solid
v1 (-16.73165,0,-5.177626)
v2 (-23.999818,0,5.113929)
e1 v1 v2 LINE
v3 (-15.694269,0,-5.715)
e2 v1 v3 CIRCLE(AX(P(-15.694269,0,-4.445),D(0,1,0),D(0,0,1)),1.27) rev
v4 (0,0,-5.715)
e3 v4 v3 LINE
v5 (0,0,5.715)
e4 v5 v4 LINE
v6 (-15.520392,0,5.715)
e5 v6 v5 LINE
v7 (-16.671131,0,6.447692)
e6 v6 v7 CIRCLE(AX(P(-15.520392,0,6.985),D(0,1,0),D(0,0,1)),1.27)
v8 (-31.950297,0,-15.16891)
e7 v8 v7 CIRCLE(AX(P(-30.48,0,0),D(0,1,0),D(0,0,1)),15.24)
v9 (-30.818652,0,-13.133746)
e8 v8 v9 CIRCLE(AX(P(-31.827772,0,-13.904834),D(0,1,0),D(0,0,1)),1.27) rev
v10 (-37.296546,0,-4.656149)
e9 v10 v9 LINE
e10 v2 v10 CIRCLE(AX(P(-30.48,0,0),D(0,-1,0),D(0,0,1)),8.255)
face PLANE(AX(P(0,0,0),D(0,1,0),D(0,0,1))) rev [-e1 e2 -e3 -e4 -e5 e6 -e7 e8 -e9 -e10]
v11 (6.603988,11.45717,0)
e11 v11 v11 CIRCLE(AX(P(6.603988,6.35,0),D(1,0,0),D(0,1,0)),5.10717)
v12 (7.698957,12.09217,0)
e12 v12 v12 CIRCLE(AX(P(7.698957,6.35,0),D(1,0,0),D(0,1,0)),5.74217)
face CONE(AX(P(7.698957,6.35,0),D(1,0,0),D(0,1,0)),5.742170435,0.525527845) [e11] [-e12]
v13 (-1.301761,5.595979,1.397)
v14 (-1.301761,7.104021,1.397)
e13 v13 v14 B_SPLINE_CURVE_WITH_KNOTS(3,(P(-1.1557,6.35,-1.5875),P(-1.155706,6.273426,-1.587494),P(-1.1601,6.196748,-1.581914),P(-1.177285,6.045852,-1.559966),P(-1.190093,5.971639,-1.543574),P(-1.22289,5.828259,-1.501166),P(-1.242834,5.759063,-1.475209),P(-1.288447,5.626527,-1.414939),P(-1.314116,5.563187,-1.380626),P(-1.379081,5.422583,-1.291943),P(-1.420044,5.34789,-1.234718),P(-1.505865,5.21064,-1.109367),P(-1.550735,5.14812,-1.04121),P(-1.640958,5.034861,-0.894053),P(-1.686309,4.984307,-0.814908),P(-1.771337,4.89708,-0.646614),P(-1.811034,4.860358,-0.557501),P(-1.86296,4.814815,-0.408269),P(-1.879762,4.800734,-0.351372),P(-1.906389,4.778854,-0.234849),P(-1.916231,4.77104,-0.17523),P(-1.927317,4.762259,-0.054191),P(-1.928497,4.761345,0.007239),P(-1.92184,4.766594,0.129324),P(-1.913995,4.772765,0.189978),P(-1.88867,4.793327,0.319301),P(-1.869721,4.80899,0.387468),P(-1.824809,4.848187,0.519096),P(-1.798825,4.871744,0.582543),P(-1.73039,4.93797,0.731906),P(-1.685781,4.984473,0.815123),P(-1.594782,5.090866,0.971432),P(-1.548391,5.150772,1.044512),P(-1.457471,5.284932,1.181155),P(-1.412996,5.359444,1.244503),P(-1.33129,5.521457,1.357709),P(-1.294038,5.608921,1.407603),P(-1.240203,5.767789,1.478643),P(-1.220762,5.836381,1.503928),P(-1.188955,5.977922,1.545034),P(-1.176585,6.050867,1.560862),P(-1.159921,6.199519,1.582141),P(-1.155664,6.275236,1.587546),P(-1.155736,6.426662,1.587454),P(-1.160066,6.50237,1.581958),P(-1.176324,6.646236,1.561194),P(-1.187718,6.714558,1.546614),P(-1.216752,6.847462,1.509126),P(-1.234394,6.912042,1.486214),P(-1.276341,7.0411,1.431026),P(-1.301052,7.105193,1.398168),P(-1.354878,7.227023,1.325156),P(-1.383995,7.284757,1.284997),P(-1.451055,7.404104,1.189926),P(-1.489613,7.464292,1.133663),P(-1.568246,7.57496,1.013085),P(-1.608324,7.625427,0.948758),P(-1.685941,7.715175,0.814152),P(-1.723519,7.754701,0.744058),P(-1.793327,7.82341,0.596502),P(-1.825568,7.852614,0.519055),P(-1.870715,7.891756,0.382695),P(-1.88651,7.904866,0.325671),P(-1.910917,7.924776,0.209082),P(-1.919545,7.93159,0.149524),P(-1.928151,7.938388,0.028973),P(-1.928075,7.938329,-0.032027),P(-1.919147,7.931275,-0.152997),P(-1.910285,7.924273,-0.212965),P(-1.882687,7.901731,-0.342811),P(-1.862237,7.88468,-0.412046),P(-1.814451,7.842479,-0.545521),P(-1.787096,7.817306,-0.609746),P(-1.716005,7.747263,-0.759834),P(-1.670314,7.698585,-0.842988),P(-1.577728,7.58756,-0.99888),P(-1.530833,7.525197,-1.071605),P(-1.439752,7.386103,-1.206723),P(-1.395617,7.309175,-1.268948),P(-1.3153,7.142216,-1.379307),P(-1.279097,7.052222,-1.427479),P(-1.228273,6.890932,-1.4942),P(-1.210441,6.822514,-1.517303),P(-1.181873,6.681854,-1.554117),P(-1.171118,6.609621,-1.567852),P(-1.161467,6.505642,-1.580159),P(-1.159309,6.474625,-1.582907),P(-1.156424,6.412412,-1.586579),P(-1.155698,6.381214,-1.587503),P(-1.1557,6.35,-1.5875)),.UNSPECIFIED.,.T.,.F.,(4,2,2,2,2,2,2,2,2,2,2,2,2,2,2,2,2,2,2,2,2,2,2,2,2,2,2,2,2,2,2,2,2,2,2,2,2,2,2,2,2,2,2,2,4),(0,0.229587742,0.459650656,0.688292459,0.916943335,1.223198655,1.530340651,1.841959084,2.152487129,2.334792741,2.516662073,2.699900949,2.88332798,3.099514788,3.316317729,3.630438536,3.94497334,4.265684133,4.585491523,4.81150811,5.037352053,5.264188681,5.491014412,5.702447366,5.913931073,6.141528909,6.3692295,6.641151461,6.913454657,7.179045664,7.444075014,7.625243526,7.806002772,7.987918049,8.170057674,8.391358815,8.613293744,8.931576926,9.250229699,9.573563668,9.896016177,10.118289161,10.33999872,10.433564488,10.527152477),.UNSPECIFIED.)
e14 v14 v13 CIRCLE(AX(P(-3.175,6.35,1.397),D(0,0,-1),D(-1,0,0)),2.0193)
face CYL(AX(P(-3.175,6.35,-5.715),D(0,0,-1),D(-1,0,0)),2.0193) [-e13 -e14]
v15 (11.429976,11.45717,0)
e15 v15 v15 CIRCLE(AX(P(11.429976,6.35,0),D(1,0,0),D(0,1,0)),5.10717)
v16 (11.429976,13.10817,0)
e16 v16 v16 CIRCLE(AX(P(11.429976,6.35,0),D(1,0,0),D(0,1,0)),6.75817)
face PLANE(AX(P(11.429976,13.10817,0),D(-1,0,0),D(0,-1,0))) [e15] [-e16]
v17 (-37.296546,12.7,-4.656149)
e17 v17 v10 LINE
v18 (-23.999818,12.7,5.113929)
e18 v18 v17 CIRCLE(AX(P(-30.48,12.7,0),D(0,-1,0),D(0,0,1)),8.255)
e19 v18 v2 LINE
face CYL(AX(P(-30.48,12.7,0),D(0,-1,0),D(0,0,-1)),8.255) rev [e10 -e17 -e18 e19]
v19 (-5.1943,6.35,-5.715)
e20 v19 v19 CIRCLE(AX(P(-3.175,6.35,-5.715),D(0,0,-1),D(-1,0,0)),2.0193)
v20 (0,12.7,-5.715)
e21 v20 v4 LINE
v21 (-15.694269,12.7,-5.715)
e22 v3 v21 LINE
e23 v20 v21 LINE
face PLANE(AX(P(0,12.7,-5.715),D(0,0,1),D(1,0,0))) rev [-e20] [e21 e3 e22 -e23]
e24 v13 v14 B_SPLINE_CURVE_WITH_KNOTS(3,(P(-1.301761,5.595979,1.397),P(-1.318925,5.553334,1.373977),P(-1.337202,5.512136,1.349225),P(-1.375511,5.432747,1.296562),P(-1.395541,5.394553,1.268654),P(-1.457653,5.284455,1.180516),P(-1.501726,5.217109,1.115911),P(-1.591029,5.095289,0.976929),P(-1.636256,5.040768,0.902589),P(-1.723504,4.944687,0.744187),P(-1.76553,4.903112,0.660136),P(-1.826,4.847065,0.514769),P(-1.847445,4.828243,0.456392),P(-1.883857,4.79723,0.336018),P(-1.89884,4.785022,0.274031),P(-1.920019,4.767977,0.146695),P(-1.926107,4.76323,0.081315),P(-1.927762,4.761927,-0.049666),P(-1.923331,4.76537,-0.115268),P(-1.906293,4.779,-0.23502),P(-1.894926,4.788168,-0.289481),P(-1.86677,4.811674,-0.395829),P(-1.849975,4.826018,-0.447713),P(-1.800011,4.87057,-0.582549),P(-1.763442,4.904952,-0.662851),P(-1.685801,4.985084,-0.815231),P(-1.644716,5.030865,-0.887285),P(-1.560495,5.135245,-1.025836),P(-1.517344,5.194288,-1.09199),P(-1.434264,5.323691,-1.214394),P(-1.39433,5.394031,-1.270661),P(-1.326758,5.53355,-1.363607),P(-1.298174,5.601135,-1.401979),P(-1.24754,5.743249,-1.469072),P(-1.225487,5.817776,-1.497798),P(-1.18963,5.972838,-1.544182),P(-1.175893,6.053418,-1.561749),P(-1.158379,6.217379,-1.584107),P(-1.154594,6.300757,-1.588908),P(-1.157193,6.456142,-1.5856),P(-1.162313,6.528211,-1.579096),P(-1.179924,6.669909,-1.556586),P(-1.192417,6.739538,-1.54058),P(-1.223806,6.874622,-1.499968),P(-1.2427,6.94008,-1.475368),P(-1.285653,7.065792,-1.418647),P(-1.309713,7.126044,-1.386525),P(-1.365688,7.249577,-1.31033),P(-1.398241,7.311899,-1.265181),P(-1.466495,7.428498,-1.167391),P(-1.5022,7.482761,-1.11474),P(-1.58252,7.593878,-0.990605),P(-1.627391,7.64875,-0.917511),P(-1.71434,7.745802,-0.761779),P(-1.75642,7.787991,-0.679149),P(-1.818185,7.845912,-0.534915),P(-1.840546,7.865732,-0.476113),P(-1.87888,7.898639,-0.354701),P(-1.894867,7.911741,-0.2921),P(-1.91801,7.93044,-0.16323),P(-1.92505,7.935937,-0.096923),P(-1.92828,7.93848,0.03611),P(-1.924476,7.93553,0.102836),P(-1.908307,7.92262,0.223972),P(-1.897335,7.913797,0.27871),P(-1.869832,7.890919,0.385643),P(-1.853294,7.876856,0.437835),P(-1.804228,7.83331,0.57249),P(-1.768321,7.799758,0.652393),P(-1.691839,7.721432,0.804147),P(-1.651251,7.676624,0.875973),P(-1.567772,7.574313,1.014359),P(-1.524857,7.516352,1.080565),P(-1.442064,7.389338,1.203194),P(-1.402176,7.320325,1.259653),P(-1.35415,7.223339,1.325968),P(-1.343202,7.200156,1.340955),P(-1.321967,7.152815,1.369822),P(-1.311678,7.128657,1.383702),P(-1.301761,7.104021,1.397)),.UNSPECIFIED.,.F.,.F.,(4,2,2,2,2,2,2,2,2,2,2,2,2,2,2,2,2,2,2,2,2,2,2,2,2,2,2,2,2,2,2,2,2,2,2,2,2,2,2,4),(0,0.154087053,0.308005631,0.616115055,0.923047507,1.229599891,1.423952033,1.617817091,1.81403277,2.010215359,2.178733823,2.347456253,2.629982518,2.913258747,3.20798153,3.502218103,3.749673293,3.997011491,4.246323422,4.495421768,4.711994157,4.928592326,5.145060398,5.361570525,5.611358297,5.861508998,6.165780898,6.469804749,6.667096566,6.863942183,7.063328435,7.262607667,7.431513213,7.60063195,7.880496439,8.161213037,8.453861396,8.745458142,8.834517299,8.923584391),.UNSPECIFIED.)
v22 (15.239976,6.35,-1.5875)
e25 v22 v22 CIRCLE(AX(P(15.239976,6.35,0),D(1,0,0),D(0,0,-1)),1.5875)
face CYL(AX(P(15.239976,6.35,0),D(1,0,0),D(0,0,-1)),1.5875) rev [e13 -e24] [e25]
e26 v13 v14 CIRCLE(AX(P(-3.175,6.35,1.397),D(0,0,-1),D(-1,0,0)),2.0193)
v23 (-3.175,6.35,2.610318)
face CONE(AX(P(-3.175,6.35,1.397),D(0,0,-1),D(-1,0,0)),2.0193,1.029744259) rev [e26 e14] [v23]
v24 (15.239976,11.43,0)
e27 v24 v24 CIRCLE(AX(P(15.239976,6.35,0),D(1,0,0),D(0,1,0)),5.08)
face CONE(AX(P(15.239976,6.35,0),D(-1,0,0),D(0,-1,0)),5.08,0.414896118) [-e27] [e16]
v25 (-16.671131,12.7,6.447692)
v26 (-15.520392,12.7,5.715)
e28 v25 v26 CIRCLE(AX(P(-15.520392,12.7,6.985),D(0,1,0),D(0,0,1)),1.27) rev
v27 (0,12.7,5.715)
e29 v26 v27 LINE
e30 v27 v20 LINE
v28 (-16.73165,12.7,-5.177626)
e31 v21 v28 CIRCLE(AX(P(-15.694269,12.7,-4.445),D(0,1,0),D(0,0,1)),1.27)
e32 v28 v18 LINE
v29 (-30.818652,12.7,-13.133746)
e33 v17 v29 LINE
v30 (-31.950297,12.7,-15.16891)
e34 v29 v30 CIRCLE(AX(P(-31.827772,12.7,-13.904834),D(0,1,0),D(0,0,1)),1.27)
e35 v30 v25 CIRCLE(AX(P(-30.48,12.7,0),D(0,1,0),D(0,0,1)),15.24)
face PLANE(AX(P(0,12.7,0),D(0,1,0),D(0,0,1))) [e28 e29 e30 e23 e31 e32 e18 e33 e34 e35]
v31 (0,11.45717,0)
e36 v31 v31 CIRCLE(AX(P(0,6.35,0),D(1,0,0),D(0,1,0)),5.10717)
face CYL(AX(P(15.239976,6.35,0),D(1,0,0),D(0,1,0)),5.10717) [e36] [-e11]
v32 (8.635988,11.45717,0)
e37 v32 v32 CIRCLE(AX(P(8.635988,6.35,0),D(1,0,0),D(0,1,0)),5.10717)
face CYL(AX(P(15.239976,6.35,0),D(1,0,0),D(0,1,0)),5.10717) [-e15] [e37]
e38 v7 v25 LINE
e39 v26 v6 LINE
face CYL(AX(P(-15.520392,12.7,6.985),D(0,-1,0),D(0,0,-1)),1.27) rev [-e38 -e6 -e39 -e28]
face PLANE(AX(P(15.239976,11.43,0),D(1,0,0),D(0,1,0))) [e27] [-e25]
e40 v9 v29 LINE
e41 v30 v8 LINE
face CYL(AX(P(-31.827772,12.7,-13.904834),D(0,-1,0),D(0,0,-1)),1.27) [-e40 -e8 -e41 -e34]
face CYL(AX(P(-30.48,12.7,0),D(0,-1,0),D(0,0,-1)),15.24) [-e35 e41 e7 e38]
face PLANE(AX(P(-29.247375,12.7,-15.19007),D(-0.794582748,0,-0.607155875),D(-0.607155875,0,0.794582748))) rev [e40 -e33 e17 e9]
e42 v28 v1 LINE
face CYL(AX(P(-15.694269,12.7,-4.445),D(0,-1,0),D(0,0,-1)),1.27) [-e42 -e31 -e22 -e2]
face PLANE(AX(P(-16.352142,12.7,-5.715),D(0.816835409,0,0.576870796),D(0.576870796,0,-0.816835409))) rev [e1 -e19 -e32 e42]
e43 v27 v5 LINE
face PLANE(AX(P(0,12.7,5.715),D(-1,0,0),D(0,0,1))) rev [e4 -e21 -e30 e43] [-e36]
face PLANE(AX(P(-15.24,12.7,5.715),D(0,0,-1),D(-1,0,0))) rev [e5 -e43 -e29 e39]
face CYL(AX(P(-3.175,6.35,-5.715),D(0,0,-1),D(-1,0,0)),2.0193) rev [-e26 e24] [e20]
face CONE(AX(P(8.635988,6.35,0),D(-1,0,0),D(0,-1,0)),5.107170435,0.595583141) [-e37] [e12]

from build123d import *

# Parameters (mm, degrees)
SKETCH2_W                            = 15.24
SKETCH2_H                            = 11.43
BOSS_EXTRUDE2_DEPTH                  = 12.7
F_10_32_TAPPED_HOLE1_D               = 4.0386
F_10_32_TAPPED_HOLE1_DEPTH           = 7.112
F_10_32_TAPPED_HOLE1_TIP             = 1.213317848
F_1_8_START                          = -1.927032922
F_1_8_0_125_DIAMETER_HOLE1_OUTLINE_R = 1.5875
F_1_8_0_125_DIAMETER_HOLE1_DEPTH     = 17.167008702
F_1_8_0_125_DIAMETER_HOLE1_2_ANGLE   = 43.851778
BOSS_EXTRUDE4_DEPTH                  = 12.7
FILLET3_R                            = 1.27


with BuildPart() as part:
    # Sketch2 → Boss-Extrude2 (new body)
    with BuildSketch(Plane(origin=(0, 0, 0), x_dir=(1, 0, 0), z_dir=(0, 1, 0))):
        with Locations((-7.62, 0)):
            Rectangle(SKETCH2_W, SKETCH2_H)
    extrude(amount=BOSS_EXTRUDE2_DEPTH)

    # #10-32 Tapped Hole1
    with Locations(Plane(origin=(0, 0, -5.715), x_dir=(-1, 0, 0), z_dir=(0, 0, -1))):
        with Locations((3.175, 6.35)):
            Hole(F_10_32_TAPPED_HOLE1_D / 2, depth=F_10_32_TAPPED_HOLE1_DEPTH)
            with Locations((0, 0, -(F_10_32_TAPPED_HOLE1_DEPTH + F_10_32_TAPPED_HOLE1_TIP / 2))):  # 118° drill point
                Cone(0, F_10_32_TAPPED_HOLE1_D / 2, F_10_32_TAPPED_HOLE1_TIP, mode=Mode.SUBTRACT)

    # Sketch3 → Revolve1 (revolve)
    with BuildSketch(Plane.XY):
        Polygon((0, 6.35), (0, 11.457170435), (3.81, 11.457170435), (6.60398789, 11.457170435), (7.698956629, 12.092170435), (8.63598789, 11.457170435), (11.42997578, 11.457170435), (11.42997578, 13.108170435), (15.23997578, 11.43), (15.23997578, 6.35), align=None)
    revolve(axis=Axis((15.23997578, 6.35, 0), (-1, 0, 0)))

    # 1/8 (0.125) Diameter Hole1: read off the stored shape, not the designer's step
    # 1/8 (0.125) Diameter Hole1 outline → 1/8 (0.125) Diameter Hole1 (cut)
    with BuildSketch(Plane.YZ.offset(F_1_8_START)):
        with Locations((6.35, 0)):
            Circle(F_1_8_0_125_DIAMETER_HOLE1_OUTLINE_R)
    extrude(amount=F_1_8_0_125_DIAMETER_HOLE1_DEPTH, mode=Mode.SUBTRACT)

    # 1_8 _0.125_ Diameter Hole1 2 outline → 1_8 _0.125_ Diameter Hole1 2 (revolve)
    with BuildSketch(Plane(origin=(-3.175, 6.35, 0), x_dir=(0.9276676260373513, -0.3734069838691089, 0), z_dir=(-0.3734069838691089, -0.9276676260373513, 0))):
        Polygon((2.0193, 1.587640849), (1.702020347, 1.587640849), (2.0193, 1.397), align=None)
    revolve(axis=Axis((-3.175, 6.35, 0), (0, 0, 1)), revolution_arc=F_1_8_0_125_DIAMETER_HOLE1_2_ANGLE)

    # Sketch12 → Boss-Extrude4 (add)
    with BuildSketch(Plane(origin=(0, 0, 0), x_dir=(1, 0, 0), z_dir=(0, 1, 0))):
        with BuildLine():
            Line((-15.24, 5.715), (-16.352141882, 5.715))
            Line((-16.352141882, 5.715), (-23.999818432, -5.113929199))
            ThreePointArc((-23.999818432, -5.113929199), (-35.367933104, -6.652302982), (-37.296546478, 4.656148527))
            Line((-37.296546478, 4.656148527), (-29.247375355, 15.190070325))
            ThreePointArc((-29.247375355, 15.190070325), (-43.450797932, -8.001), (-16.352141882, -5.715))
            Line((-16.352141882, -5.715), (-15.24, -5.715))
            Line((-15.24, -5.715), (-15.24, 5.715))
        make_face()
    extrude(amount=BOSS_EXTRUDE4_DEPTH)

    # Fillet3
    fillet3_edges = [part.edges().sort_by_distance(p)[0] for p in [
        (-29.247375355, 6.35, -15.190070325),
        (-16.352141882, 6.35, 5.715),
        (-16.352141882, 6.35, -5.715),
    ]]
    fillet(fillet3_edges, radius=FILLET3_R)


solid = part.part
